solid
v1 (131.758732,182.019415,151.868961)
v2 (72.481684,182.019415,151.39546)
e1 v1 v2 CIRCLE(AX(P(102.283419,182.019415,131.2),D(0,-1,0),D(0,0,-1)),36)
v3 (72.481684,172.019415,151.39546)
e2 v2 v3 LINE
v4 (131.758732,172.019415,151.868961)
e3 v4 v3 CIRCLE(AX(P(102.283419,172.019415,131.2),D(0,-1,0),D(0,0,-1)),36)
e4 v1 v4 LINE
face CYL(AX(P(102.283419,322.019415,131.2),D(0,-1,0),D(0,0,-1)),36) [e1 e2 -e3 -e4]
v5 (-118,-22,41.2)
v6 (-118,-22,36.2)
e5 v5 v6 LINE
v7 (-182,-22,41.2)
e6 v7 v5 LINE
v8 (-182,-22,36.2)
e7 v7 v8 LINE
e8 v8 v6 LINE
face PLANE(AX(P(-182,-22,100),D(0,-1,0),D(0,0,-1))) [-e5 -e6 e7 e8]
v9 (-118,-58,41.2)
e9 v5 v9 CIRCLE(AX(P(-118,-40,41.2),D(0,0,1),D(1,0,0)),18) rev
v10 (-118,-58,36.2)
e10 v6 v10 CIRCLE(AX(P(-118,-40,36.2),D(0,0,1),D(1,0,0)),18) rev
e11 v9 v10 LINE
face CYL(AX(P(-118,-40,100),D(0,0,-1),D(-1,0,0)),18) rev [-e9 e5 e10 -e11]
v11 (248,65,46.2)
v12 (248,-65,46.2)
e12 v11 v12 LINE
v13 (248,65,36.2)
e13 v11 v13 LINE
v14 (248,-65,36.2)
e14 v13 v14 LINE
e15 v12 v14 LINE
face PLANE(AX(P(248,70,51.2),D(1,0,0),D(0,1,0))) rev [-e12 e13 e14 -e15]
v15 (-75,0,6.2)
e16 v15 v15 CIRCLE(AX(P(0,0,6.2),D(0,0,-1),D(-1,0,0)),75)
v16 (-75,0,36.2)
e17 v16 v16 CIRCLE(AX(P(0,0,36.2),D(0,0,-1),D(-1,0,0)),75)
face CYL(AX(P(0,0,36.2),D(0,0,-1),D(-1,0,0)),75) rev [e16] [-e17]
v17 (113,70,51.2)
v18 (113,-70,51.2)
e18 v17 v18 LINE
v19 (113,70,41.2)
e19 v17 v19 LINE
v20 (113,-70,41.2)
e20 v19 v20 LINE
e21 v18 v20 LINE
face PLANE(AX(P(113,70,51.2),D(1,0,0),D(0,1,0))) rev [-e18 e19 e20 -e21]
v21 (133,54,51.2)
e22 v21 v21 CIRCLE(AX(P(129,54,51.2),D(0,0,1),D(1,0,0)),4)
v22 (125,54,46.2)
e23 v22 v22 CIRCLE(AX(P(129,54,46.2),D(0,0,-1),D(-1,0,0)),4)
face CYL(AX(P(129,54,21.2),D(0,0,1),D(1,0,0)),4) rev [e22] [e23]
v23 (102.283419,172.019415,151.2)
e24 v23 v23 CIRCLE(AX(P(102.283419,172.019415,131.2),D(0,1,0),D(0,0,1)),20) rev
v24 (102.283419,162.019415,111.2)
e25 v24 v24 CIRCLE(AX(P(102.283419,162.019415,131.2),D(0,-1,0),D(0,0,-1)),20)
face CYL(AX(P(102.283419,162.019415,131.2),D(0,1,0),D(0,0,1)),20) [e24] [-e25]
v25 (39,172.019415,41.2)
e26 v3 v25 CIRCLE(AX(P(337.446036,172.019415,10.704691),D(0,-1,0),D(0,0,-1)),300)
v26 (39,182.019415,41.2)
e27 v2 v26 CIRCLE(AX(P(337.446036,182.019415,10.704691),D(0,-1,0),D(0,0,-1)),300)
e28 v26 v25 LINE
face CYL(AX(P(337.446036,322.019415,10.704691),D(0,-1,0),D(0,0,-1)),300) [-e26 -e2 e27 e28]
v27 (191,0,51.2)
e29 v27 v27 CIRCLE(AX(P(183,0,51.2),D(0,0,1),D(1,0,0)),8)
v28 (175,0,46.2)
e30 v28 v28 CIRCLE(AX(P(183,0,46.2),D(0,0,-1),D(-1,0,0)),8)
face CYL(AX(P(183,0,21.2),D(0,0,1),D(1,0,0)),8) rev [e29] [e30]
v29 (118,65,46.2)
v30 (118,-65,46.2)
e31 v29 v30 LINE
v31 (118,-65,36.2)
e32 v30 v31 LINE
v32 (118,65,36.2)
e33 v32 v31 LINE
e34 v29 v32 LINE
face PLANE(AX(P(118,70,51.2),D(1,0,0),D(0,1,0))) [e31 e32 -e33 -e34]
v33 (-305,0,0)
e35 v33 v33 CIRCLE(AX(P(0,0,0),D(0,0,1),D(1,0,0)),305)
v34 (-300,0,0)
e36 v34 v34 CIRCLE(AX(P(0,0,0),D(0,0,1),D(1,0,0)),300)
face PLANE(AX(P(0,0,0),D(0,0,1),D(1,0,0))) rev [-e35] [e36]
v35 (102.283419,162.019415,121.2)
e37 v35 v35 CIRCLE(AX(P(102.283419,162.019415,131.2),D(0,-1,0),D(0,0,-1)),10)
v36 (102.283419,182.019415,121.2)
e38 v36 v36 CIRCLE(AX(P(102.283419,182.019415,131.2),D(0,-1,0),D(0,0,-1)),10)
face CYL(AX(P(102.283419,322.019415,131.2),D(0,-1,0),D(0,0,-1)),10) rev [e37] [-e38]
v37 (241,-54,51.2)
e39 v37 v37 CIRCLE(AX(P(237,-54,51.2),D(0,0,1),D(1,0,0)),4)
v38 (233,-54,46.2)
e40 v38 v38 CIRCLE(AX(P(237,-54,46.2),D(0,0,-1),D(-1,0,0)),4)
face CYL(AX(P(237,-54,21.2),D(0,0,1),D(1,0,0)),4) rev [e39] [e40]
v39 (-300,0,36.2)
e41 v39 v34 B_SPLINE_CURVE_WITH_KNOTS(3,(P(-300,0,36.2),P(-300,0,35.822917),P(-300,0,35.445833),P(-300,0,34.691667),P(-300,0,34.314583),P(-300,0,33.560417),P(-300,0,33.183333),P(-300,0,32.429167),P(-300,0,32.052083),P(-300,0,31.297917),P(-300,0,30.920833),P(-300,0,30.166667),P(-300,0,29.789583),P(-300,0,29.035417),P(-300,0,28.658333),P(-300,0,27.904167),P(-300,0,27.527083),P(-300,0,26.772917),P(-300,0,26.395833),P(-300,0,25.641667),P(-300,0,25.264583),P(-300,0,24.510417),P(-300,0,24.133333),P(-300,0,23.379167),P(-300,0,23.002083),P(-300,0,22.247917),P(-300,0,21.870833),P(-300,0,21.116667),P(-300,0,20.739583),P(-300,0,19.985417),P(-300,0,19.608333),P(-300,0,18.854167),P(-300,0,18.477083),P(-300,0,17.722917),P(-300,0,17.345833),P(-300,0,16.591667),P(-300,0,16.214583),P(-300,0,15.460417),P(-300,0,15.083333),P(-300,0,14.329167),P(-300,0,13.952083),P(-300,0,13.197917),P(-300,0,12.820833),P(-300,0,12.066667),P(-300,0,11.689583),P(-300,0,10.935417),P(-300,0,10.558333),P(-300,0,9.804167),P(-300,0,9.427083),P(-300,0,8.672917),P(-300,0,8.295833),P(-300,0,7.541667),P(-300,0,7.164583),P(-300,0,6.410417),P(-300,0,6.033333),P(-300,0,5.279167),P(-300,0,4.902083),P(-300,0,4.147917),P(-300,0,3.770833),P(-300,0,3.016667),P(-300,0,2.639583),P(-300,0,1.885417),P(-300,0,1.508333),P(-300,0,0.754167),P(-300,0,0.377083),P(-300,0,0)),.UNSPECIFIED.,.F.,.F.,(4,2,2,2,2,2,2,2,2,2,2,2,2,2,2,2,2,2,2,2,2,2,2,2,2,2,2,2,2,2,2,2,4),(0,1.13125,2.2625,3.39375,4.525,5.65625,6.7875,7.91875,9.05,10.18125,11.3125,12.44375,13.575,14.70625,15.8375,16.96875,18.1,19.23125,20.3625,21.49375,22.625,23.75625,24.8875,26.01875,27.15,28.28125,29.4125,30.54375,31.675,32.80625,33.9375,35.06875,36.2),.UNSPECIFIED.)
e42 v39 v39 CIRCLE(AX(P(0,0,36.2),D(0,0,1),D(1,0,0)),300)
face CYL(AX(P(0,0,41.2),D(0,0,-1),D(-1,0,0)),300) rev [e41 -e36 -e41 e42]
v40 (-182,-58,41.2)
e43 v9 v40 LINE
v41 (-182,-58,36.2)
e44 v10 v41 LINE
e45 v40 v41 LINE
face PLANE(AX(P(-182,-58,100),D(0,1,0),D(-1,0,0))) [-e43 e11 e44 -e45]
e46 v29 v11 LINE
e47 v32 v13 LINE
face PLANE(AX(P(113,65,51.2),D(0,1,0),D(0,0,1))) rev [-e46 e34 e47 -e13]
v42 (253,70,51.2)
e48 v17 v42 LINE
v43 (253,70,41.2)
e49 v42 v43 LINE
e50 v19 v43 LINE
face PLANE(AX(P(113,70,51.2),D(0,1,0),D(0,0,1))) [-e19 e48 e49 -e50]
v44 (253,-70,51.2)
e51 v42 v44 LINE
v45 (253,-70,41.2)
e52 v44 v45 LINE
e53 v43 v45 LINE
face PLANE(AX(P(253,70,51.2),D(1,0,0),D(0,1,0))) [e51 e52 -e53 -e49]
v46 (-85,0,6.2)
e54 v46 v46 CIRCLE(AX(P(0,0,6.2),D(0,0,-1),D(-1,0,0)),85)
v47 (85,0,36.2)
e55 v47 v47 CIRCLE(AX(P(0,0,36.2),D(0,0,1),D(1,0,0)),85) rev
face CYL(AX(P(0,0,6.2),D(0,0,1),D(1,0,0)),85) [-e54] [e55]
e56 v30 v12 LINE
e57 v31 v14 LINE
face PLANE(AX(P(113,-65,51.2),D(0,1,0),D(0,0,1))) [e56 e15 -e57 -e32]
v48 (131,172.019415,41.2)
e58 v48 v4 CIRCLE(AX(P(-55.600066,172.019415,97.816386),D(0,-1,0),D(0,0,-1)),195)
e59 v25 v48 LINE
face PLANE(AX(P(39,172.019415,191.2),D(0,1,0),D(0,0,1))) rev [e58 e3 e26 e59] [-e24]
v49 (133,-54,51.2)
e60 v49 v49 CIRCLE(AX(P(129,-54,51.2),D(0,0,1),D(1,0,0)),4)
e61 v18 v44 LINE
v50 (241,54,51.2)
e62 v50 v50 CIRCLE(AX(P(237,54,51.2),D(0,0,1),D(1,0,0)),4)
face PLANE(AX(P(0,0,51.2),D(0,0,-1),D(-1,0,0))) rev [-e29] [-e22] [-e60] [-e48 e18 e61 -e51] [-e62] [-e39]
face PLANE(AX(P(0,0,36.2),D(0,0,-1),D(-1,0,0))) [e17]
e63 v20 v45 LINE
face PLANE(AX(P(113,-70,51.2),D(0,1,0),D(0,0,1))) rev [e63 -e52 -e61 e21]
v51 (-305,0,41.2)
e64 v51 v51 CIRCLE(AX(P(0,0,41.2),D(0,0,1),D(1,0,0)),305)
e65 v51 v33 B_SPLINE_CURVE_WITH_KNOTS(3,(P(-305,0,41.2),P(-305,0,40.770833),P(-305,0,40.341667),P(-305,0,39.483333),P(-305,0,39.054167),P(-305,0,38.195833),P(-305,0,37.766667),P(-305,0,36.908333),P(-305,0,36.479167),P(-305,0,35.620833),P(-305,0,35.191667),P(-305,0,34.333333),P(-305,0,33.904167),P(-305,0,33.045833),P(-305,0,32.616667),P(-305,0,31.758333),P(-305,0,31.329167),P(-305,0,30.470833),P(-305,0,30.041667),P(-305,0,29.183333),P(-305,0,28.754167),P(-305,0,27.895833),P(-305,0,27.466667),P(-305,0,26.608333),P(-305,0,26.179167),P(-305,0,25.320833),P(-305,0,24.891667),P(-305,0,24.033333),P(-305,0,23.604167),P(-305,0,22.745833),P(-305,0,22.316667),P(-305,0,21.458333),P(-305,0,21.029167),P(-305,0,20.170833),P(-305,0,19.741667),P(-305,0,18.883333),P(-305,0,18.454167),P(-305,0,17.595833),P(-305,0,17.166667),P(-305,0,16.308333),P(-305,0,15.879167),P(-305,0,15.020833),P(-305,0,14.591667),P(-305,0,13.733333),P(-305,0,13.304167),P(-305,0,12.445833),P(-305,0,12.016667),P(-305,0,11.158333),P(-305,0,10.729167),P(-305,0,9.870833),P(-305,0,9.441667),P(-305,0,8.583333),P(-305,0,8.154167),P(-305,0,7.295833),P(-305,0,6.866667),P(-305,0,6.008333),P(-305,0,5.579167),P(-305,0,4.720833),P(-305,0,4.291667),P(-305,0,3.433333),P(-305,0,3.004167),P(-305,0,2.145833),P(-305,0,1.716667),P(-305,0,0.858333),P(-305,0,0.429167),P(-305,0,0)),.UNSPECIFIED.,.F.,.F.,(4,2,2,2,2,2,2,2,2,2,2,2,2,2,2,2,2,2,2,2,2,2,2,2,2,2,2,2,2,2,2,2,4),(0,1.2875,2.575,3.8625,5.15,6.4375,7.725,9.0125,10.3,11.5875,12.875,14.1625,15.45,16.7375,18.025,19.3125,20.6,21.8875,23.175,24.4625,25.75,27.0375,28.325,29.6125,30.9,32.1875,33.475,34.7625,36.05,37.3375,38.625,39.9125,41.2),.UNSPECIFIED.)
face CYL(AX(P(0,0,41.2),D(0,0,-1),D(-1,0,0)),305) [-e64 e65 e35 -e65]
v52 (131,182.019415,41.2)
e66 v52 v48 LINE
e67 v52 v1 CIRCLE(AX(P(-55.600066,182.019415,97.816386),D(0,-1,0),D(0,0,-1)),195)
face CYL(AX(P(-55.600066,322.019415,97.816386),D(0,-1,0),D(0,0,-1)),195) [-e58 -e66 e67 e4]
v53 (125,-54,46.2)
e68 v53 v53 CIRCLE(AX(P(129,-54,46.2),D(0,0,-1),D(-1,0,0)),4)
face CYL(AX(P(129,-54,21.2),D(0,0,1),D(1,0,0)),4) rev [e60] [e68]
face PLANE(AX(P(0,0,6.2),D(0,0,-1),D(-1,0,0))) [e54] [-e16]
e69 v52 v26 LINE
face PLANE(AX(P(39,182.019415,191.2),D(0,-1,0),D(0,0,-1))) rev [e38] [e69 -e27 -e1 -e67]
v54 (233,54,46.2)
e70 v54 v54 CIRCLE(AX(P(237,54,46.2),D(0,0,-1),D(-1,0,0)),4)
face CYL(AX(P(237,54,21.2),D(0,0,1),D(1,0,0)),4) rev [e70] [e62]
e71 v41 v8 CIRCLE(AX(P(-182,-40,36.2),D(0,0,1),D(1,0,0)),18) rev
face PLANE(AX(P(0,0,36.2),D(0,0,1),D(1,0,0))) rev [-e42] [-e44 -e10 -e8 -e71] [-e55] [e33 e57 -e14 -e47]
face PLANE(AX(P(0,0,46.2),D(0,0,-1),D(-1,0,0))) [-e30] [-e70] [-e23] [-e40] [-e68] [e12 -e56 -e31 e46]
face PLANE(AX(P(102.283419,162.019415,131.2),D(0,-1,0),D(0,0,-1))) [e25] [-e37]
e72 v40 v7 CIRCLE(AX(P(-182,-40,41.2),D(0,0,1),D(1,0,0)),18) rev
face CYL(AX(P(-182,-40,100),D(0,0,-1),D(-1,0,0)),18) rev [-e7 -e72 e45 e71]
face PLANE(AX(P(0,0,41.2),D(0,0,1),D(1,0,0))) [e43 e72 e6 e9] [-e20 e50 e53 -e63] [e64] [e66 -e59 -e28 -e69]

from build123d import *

# Parameters (mm, degrees)
SKETCH_1_R           = 305
EXTRUDE_1_DEPTH      = 41.2
SKETCH_2_W           = 140
SKETCH_2_H           = 140
EXTRUDE_2_DEPTH      = 10
SHELL_1_T            = -5
CUT_EXTRUDE_9_DEPTH  = 100
SKETCH_5_W           = 120
SKETCH_5_H           = 10
EXTRUDE_3_DEPTH      = 150
CUT_EXTRUDE_10_DEPTH = 150
SKETCH_10_R          = 10
CUT_EXTRUDE_11_DEPTH = 150
EXTRUDE_START        = 10
SKETCH_11_R          = 20
SKETCH_11_R_2        = 10
EXTRUDE_4_DEPTH      = 10
SKETCH_18_R          = 85
EXTRUDE_7_DEPTH      = 30
SKETCH_19_R          = 75
CUT_EXTRUDE_12_DEPTH = 30
SKETCH_21_R          = 4
SKETCH_21_R_2        = 8
CUT_EXTRUDE_13_DEPTH = 30


with BuildPart() as part:
    # 草图1 → 凸台-拉伸1 (new body)
    with BuildSketch(Plane.XY):
        Circle(SKETCH_1_R)
    extrude(amount=EXTRUDE_1_DEPTH)

    # 草图2 → 凸台-拉伸2 (add)
    with BuildSketch(Plane.XY.offset(41.2)):
        with Locations((183, 0)):
            Rectangle(SKETCH_2_W, SKETCH_2_H)
    extrude(amount=EXTRUDE_2_DEPTH)

    # 抽壳1
    shell_1_openings = [part.faces().sort_by_distance(p)[0] for p in [
        (0, 0, 0),
    ]]
    offset(amount=SHELL_1_T, openings=shell_1_openings, kind=Kind.INTERSECTION)

    # 草图4 → 切除-拉伸9 (cut)
    with BuildSketch(Plane.XY):
        with BuildLine():
            Line((-182, -22), (-118, -22))
            ThreePointArc((-118, -22), (-100, -40), (-118, -58))
            Line((-118, -58), (-182, -58))
            ThreePointArc((-182, -58), (-200, -40), (-182, -22))
        make_face()
    extrude(amount=CUT_EXTRUDE_9_DEPTH, mode=Mode.SUBTRACT)

    # 草图5 → 凸台-拉伸3 (add)
    with BuildSketch(Plane.XY.offset(41.2)):
        with Locations((99, 177.019414693)):
            Rectangle(SKETCH_5_W, SKETCH_5_H)
    extrude(amount=EXTRUDE_3_DEPTH)

    # 草图9 → 切除-拉伸10 (cut)
    with BuildSketch(Plane.XZ.offset(-172.019414693)):
        with BuildLine():
            Line((159, 191.2), (39, 191.2))
            Line((39, 191.2), (39, 41.2))
            ThreePointArc((39, 41.2), (50.403223503, 97.919506773), (72.48168386, 151.395459716))
            ThreePointArc((72.48168386, 151.395459716), (95.641745104, 166.582031742), (122.732592827, 160.828217675))
            ThreePointArc((122.732592827, 160.828217675), (127.644425669, 156.750329387), (131.758731658, 151.868960626))
            ThreePointArc((131.758731658, 151.868960626), (139.395350951, 96.479523786), (131, 41.2))
            Line((131, 41.2), (159, 41.2))
            Line((159, 41.2), (159, 191.2))
        make_face()
    extrude(amount=-CUT_EXTRUDE_10_DEPTH, mode=Mode.SUBTRACT)

    # 草图10 → 切除-拉伸11 (cut)
    with BuildSketch(Plane.XZ.offset(-172.019414693)):
        with Locations((102.283418824, 131.2)):
            Circle(SKETCH_10_R)
    extrude(amount=-CUT_EXTRUDE_11_DEPTH, mode=Mode.SUBTRACT)

    # 草图11 → 凸台-拉伸4 (add)
    with BuildSketch(Plane.XZ.offset(-172.019414693).offset(EXTRUDE_START)):
        with Locations((102.283418824, 131.2)):
            Circle(SKETCH_11_R)
        with Locations((102.283418824, 131.2)):
            Circle(SKETCH_11_R_2, mode=Mode.SUBTRACT)
    extrude(amount=-EXTRUDE_4_DEPTH)

    # 草图18 → 凸台-拉伸7 (add)
    with BuildSketch(Plane(origin=(0, 0, 36.2), x_dir=(-1, 0, 0), z_dir=(0, 0, -1))):
        Circle(SKETCH_18_R)
    extrude(amount=EXTRUDE_7_DEPTH)

    # 草图19 → 切除-拉伸12 (cut)
    with BuildSketch(Plane(origin=(0, 0, 6.2), x_dir=(-1, 0, 0), z_dir=(0, 0, -1))):
        Circle(SKETCH_19_R)
    extrude(amount=-CUT_EXTRUDE_12_DEPTH, mode=Mode.SUBTRACT)

    # 草图21 → 切除-拉伸13 (cut)
    with BuildSketch(Plane.XY.offset(51.2)):
        with Locations((237, 54)):
            Circle(SKETCH_21_R)
        with Locations((129, 54)):
            Circle(SKETCH_21_R)
        with Locations((237, -54)):
            Circle(SKETCH_21_R)
        with Locations((129, -54)):
            Circle(SKETCH_21_R)
        with Locations((183, 0)):
            Circle(SKETCH_21_R_2)
    extrude(amount=-CUT_EXTRUDE_13_DEPTH, mode=Mode.SUBTRACT)


solid = part.part
